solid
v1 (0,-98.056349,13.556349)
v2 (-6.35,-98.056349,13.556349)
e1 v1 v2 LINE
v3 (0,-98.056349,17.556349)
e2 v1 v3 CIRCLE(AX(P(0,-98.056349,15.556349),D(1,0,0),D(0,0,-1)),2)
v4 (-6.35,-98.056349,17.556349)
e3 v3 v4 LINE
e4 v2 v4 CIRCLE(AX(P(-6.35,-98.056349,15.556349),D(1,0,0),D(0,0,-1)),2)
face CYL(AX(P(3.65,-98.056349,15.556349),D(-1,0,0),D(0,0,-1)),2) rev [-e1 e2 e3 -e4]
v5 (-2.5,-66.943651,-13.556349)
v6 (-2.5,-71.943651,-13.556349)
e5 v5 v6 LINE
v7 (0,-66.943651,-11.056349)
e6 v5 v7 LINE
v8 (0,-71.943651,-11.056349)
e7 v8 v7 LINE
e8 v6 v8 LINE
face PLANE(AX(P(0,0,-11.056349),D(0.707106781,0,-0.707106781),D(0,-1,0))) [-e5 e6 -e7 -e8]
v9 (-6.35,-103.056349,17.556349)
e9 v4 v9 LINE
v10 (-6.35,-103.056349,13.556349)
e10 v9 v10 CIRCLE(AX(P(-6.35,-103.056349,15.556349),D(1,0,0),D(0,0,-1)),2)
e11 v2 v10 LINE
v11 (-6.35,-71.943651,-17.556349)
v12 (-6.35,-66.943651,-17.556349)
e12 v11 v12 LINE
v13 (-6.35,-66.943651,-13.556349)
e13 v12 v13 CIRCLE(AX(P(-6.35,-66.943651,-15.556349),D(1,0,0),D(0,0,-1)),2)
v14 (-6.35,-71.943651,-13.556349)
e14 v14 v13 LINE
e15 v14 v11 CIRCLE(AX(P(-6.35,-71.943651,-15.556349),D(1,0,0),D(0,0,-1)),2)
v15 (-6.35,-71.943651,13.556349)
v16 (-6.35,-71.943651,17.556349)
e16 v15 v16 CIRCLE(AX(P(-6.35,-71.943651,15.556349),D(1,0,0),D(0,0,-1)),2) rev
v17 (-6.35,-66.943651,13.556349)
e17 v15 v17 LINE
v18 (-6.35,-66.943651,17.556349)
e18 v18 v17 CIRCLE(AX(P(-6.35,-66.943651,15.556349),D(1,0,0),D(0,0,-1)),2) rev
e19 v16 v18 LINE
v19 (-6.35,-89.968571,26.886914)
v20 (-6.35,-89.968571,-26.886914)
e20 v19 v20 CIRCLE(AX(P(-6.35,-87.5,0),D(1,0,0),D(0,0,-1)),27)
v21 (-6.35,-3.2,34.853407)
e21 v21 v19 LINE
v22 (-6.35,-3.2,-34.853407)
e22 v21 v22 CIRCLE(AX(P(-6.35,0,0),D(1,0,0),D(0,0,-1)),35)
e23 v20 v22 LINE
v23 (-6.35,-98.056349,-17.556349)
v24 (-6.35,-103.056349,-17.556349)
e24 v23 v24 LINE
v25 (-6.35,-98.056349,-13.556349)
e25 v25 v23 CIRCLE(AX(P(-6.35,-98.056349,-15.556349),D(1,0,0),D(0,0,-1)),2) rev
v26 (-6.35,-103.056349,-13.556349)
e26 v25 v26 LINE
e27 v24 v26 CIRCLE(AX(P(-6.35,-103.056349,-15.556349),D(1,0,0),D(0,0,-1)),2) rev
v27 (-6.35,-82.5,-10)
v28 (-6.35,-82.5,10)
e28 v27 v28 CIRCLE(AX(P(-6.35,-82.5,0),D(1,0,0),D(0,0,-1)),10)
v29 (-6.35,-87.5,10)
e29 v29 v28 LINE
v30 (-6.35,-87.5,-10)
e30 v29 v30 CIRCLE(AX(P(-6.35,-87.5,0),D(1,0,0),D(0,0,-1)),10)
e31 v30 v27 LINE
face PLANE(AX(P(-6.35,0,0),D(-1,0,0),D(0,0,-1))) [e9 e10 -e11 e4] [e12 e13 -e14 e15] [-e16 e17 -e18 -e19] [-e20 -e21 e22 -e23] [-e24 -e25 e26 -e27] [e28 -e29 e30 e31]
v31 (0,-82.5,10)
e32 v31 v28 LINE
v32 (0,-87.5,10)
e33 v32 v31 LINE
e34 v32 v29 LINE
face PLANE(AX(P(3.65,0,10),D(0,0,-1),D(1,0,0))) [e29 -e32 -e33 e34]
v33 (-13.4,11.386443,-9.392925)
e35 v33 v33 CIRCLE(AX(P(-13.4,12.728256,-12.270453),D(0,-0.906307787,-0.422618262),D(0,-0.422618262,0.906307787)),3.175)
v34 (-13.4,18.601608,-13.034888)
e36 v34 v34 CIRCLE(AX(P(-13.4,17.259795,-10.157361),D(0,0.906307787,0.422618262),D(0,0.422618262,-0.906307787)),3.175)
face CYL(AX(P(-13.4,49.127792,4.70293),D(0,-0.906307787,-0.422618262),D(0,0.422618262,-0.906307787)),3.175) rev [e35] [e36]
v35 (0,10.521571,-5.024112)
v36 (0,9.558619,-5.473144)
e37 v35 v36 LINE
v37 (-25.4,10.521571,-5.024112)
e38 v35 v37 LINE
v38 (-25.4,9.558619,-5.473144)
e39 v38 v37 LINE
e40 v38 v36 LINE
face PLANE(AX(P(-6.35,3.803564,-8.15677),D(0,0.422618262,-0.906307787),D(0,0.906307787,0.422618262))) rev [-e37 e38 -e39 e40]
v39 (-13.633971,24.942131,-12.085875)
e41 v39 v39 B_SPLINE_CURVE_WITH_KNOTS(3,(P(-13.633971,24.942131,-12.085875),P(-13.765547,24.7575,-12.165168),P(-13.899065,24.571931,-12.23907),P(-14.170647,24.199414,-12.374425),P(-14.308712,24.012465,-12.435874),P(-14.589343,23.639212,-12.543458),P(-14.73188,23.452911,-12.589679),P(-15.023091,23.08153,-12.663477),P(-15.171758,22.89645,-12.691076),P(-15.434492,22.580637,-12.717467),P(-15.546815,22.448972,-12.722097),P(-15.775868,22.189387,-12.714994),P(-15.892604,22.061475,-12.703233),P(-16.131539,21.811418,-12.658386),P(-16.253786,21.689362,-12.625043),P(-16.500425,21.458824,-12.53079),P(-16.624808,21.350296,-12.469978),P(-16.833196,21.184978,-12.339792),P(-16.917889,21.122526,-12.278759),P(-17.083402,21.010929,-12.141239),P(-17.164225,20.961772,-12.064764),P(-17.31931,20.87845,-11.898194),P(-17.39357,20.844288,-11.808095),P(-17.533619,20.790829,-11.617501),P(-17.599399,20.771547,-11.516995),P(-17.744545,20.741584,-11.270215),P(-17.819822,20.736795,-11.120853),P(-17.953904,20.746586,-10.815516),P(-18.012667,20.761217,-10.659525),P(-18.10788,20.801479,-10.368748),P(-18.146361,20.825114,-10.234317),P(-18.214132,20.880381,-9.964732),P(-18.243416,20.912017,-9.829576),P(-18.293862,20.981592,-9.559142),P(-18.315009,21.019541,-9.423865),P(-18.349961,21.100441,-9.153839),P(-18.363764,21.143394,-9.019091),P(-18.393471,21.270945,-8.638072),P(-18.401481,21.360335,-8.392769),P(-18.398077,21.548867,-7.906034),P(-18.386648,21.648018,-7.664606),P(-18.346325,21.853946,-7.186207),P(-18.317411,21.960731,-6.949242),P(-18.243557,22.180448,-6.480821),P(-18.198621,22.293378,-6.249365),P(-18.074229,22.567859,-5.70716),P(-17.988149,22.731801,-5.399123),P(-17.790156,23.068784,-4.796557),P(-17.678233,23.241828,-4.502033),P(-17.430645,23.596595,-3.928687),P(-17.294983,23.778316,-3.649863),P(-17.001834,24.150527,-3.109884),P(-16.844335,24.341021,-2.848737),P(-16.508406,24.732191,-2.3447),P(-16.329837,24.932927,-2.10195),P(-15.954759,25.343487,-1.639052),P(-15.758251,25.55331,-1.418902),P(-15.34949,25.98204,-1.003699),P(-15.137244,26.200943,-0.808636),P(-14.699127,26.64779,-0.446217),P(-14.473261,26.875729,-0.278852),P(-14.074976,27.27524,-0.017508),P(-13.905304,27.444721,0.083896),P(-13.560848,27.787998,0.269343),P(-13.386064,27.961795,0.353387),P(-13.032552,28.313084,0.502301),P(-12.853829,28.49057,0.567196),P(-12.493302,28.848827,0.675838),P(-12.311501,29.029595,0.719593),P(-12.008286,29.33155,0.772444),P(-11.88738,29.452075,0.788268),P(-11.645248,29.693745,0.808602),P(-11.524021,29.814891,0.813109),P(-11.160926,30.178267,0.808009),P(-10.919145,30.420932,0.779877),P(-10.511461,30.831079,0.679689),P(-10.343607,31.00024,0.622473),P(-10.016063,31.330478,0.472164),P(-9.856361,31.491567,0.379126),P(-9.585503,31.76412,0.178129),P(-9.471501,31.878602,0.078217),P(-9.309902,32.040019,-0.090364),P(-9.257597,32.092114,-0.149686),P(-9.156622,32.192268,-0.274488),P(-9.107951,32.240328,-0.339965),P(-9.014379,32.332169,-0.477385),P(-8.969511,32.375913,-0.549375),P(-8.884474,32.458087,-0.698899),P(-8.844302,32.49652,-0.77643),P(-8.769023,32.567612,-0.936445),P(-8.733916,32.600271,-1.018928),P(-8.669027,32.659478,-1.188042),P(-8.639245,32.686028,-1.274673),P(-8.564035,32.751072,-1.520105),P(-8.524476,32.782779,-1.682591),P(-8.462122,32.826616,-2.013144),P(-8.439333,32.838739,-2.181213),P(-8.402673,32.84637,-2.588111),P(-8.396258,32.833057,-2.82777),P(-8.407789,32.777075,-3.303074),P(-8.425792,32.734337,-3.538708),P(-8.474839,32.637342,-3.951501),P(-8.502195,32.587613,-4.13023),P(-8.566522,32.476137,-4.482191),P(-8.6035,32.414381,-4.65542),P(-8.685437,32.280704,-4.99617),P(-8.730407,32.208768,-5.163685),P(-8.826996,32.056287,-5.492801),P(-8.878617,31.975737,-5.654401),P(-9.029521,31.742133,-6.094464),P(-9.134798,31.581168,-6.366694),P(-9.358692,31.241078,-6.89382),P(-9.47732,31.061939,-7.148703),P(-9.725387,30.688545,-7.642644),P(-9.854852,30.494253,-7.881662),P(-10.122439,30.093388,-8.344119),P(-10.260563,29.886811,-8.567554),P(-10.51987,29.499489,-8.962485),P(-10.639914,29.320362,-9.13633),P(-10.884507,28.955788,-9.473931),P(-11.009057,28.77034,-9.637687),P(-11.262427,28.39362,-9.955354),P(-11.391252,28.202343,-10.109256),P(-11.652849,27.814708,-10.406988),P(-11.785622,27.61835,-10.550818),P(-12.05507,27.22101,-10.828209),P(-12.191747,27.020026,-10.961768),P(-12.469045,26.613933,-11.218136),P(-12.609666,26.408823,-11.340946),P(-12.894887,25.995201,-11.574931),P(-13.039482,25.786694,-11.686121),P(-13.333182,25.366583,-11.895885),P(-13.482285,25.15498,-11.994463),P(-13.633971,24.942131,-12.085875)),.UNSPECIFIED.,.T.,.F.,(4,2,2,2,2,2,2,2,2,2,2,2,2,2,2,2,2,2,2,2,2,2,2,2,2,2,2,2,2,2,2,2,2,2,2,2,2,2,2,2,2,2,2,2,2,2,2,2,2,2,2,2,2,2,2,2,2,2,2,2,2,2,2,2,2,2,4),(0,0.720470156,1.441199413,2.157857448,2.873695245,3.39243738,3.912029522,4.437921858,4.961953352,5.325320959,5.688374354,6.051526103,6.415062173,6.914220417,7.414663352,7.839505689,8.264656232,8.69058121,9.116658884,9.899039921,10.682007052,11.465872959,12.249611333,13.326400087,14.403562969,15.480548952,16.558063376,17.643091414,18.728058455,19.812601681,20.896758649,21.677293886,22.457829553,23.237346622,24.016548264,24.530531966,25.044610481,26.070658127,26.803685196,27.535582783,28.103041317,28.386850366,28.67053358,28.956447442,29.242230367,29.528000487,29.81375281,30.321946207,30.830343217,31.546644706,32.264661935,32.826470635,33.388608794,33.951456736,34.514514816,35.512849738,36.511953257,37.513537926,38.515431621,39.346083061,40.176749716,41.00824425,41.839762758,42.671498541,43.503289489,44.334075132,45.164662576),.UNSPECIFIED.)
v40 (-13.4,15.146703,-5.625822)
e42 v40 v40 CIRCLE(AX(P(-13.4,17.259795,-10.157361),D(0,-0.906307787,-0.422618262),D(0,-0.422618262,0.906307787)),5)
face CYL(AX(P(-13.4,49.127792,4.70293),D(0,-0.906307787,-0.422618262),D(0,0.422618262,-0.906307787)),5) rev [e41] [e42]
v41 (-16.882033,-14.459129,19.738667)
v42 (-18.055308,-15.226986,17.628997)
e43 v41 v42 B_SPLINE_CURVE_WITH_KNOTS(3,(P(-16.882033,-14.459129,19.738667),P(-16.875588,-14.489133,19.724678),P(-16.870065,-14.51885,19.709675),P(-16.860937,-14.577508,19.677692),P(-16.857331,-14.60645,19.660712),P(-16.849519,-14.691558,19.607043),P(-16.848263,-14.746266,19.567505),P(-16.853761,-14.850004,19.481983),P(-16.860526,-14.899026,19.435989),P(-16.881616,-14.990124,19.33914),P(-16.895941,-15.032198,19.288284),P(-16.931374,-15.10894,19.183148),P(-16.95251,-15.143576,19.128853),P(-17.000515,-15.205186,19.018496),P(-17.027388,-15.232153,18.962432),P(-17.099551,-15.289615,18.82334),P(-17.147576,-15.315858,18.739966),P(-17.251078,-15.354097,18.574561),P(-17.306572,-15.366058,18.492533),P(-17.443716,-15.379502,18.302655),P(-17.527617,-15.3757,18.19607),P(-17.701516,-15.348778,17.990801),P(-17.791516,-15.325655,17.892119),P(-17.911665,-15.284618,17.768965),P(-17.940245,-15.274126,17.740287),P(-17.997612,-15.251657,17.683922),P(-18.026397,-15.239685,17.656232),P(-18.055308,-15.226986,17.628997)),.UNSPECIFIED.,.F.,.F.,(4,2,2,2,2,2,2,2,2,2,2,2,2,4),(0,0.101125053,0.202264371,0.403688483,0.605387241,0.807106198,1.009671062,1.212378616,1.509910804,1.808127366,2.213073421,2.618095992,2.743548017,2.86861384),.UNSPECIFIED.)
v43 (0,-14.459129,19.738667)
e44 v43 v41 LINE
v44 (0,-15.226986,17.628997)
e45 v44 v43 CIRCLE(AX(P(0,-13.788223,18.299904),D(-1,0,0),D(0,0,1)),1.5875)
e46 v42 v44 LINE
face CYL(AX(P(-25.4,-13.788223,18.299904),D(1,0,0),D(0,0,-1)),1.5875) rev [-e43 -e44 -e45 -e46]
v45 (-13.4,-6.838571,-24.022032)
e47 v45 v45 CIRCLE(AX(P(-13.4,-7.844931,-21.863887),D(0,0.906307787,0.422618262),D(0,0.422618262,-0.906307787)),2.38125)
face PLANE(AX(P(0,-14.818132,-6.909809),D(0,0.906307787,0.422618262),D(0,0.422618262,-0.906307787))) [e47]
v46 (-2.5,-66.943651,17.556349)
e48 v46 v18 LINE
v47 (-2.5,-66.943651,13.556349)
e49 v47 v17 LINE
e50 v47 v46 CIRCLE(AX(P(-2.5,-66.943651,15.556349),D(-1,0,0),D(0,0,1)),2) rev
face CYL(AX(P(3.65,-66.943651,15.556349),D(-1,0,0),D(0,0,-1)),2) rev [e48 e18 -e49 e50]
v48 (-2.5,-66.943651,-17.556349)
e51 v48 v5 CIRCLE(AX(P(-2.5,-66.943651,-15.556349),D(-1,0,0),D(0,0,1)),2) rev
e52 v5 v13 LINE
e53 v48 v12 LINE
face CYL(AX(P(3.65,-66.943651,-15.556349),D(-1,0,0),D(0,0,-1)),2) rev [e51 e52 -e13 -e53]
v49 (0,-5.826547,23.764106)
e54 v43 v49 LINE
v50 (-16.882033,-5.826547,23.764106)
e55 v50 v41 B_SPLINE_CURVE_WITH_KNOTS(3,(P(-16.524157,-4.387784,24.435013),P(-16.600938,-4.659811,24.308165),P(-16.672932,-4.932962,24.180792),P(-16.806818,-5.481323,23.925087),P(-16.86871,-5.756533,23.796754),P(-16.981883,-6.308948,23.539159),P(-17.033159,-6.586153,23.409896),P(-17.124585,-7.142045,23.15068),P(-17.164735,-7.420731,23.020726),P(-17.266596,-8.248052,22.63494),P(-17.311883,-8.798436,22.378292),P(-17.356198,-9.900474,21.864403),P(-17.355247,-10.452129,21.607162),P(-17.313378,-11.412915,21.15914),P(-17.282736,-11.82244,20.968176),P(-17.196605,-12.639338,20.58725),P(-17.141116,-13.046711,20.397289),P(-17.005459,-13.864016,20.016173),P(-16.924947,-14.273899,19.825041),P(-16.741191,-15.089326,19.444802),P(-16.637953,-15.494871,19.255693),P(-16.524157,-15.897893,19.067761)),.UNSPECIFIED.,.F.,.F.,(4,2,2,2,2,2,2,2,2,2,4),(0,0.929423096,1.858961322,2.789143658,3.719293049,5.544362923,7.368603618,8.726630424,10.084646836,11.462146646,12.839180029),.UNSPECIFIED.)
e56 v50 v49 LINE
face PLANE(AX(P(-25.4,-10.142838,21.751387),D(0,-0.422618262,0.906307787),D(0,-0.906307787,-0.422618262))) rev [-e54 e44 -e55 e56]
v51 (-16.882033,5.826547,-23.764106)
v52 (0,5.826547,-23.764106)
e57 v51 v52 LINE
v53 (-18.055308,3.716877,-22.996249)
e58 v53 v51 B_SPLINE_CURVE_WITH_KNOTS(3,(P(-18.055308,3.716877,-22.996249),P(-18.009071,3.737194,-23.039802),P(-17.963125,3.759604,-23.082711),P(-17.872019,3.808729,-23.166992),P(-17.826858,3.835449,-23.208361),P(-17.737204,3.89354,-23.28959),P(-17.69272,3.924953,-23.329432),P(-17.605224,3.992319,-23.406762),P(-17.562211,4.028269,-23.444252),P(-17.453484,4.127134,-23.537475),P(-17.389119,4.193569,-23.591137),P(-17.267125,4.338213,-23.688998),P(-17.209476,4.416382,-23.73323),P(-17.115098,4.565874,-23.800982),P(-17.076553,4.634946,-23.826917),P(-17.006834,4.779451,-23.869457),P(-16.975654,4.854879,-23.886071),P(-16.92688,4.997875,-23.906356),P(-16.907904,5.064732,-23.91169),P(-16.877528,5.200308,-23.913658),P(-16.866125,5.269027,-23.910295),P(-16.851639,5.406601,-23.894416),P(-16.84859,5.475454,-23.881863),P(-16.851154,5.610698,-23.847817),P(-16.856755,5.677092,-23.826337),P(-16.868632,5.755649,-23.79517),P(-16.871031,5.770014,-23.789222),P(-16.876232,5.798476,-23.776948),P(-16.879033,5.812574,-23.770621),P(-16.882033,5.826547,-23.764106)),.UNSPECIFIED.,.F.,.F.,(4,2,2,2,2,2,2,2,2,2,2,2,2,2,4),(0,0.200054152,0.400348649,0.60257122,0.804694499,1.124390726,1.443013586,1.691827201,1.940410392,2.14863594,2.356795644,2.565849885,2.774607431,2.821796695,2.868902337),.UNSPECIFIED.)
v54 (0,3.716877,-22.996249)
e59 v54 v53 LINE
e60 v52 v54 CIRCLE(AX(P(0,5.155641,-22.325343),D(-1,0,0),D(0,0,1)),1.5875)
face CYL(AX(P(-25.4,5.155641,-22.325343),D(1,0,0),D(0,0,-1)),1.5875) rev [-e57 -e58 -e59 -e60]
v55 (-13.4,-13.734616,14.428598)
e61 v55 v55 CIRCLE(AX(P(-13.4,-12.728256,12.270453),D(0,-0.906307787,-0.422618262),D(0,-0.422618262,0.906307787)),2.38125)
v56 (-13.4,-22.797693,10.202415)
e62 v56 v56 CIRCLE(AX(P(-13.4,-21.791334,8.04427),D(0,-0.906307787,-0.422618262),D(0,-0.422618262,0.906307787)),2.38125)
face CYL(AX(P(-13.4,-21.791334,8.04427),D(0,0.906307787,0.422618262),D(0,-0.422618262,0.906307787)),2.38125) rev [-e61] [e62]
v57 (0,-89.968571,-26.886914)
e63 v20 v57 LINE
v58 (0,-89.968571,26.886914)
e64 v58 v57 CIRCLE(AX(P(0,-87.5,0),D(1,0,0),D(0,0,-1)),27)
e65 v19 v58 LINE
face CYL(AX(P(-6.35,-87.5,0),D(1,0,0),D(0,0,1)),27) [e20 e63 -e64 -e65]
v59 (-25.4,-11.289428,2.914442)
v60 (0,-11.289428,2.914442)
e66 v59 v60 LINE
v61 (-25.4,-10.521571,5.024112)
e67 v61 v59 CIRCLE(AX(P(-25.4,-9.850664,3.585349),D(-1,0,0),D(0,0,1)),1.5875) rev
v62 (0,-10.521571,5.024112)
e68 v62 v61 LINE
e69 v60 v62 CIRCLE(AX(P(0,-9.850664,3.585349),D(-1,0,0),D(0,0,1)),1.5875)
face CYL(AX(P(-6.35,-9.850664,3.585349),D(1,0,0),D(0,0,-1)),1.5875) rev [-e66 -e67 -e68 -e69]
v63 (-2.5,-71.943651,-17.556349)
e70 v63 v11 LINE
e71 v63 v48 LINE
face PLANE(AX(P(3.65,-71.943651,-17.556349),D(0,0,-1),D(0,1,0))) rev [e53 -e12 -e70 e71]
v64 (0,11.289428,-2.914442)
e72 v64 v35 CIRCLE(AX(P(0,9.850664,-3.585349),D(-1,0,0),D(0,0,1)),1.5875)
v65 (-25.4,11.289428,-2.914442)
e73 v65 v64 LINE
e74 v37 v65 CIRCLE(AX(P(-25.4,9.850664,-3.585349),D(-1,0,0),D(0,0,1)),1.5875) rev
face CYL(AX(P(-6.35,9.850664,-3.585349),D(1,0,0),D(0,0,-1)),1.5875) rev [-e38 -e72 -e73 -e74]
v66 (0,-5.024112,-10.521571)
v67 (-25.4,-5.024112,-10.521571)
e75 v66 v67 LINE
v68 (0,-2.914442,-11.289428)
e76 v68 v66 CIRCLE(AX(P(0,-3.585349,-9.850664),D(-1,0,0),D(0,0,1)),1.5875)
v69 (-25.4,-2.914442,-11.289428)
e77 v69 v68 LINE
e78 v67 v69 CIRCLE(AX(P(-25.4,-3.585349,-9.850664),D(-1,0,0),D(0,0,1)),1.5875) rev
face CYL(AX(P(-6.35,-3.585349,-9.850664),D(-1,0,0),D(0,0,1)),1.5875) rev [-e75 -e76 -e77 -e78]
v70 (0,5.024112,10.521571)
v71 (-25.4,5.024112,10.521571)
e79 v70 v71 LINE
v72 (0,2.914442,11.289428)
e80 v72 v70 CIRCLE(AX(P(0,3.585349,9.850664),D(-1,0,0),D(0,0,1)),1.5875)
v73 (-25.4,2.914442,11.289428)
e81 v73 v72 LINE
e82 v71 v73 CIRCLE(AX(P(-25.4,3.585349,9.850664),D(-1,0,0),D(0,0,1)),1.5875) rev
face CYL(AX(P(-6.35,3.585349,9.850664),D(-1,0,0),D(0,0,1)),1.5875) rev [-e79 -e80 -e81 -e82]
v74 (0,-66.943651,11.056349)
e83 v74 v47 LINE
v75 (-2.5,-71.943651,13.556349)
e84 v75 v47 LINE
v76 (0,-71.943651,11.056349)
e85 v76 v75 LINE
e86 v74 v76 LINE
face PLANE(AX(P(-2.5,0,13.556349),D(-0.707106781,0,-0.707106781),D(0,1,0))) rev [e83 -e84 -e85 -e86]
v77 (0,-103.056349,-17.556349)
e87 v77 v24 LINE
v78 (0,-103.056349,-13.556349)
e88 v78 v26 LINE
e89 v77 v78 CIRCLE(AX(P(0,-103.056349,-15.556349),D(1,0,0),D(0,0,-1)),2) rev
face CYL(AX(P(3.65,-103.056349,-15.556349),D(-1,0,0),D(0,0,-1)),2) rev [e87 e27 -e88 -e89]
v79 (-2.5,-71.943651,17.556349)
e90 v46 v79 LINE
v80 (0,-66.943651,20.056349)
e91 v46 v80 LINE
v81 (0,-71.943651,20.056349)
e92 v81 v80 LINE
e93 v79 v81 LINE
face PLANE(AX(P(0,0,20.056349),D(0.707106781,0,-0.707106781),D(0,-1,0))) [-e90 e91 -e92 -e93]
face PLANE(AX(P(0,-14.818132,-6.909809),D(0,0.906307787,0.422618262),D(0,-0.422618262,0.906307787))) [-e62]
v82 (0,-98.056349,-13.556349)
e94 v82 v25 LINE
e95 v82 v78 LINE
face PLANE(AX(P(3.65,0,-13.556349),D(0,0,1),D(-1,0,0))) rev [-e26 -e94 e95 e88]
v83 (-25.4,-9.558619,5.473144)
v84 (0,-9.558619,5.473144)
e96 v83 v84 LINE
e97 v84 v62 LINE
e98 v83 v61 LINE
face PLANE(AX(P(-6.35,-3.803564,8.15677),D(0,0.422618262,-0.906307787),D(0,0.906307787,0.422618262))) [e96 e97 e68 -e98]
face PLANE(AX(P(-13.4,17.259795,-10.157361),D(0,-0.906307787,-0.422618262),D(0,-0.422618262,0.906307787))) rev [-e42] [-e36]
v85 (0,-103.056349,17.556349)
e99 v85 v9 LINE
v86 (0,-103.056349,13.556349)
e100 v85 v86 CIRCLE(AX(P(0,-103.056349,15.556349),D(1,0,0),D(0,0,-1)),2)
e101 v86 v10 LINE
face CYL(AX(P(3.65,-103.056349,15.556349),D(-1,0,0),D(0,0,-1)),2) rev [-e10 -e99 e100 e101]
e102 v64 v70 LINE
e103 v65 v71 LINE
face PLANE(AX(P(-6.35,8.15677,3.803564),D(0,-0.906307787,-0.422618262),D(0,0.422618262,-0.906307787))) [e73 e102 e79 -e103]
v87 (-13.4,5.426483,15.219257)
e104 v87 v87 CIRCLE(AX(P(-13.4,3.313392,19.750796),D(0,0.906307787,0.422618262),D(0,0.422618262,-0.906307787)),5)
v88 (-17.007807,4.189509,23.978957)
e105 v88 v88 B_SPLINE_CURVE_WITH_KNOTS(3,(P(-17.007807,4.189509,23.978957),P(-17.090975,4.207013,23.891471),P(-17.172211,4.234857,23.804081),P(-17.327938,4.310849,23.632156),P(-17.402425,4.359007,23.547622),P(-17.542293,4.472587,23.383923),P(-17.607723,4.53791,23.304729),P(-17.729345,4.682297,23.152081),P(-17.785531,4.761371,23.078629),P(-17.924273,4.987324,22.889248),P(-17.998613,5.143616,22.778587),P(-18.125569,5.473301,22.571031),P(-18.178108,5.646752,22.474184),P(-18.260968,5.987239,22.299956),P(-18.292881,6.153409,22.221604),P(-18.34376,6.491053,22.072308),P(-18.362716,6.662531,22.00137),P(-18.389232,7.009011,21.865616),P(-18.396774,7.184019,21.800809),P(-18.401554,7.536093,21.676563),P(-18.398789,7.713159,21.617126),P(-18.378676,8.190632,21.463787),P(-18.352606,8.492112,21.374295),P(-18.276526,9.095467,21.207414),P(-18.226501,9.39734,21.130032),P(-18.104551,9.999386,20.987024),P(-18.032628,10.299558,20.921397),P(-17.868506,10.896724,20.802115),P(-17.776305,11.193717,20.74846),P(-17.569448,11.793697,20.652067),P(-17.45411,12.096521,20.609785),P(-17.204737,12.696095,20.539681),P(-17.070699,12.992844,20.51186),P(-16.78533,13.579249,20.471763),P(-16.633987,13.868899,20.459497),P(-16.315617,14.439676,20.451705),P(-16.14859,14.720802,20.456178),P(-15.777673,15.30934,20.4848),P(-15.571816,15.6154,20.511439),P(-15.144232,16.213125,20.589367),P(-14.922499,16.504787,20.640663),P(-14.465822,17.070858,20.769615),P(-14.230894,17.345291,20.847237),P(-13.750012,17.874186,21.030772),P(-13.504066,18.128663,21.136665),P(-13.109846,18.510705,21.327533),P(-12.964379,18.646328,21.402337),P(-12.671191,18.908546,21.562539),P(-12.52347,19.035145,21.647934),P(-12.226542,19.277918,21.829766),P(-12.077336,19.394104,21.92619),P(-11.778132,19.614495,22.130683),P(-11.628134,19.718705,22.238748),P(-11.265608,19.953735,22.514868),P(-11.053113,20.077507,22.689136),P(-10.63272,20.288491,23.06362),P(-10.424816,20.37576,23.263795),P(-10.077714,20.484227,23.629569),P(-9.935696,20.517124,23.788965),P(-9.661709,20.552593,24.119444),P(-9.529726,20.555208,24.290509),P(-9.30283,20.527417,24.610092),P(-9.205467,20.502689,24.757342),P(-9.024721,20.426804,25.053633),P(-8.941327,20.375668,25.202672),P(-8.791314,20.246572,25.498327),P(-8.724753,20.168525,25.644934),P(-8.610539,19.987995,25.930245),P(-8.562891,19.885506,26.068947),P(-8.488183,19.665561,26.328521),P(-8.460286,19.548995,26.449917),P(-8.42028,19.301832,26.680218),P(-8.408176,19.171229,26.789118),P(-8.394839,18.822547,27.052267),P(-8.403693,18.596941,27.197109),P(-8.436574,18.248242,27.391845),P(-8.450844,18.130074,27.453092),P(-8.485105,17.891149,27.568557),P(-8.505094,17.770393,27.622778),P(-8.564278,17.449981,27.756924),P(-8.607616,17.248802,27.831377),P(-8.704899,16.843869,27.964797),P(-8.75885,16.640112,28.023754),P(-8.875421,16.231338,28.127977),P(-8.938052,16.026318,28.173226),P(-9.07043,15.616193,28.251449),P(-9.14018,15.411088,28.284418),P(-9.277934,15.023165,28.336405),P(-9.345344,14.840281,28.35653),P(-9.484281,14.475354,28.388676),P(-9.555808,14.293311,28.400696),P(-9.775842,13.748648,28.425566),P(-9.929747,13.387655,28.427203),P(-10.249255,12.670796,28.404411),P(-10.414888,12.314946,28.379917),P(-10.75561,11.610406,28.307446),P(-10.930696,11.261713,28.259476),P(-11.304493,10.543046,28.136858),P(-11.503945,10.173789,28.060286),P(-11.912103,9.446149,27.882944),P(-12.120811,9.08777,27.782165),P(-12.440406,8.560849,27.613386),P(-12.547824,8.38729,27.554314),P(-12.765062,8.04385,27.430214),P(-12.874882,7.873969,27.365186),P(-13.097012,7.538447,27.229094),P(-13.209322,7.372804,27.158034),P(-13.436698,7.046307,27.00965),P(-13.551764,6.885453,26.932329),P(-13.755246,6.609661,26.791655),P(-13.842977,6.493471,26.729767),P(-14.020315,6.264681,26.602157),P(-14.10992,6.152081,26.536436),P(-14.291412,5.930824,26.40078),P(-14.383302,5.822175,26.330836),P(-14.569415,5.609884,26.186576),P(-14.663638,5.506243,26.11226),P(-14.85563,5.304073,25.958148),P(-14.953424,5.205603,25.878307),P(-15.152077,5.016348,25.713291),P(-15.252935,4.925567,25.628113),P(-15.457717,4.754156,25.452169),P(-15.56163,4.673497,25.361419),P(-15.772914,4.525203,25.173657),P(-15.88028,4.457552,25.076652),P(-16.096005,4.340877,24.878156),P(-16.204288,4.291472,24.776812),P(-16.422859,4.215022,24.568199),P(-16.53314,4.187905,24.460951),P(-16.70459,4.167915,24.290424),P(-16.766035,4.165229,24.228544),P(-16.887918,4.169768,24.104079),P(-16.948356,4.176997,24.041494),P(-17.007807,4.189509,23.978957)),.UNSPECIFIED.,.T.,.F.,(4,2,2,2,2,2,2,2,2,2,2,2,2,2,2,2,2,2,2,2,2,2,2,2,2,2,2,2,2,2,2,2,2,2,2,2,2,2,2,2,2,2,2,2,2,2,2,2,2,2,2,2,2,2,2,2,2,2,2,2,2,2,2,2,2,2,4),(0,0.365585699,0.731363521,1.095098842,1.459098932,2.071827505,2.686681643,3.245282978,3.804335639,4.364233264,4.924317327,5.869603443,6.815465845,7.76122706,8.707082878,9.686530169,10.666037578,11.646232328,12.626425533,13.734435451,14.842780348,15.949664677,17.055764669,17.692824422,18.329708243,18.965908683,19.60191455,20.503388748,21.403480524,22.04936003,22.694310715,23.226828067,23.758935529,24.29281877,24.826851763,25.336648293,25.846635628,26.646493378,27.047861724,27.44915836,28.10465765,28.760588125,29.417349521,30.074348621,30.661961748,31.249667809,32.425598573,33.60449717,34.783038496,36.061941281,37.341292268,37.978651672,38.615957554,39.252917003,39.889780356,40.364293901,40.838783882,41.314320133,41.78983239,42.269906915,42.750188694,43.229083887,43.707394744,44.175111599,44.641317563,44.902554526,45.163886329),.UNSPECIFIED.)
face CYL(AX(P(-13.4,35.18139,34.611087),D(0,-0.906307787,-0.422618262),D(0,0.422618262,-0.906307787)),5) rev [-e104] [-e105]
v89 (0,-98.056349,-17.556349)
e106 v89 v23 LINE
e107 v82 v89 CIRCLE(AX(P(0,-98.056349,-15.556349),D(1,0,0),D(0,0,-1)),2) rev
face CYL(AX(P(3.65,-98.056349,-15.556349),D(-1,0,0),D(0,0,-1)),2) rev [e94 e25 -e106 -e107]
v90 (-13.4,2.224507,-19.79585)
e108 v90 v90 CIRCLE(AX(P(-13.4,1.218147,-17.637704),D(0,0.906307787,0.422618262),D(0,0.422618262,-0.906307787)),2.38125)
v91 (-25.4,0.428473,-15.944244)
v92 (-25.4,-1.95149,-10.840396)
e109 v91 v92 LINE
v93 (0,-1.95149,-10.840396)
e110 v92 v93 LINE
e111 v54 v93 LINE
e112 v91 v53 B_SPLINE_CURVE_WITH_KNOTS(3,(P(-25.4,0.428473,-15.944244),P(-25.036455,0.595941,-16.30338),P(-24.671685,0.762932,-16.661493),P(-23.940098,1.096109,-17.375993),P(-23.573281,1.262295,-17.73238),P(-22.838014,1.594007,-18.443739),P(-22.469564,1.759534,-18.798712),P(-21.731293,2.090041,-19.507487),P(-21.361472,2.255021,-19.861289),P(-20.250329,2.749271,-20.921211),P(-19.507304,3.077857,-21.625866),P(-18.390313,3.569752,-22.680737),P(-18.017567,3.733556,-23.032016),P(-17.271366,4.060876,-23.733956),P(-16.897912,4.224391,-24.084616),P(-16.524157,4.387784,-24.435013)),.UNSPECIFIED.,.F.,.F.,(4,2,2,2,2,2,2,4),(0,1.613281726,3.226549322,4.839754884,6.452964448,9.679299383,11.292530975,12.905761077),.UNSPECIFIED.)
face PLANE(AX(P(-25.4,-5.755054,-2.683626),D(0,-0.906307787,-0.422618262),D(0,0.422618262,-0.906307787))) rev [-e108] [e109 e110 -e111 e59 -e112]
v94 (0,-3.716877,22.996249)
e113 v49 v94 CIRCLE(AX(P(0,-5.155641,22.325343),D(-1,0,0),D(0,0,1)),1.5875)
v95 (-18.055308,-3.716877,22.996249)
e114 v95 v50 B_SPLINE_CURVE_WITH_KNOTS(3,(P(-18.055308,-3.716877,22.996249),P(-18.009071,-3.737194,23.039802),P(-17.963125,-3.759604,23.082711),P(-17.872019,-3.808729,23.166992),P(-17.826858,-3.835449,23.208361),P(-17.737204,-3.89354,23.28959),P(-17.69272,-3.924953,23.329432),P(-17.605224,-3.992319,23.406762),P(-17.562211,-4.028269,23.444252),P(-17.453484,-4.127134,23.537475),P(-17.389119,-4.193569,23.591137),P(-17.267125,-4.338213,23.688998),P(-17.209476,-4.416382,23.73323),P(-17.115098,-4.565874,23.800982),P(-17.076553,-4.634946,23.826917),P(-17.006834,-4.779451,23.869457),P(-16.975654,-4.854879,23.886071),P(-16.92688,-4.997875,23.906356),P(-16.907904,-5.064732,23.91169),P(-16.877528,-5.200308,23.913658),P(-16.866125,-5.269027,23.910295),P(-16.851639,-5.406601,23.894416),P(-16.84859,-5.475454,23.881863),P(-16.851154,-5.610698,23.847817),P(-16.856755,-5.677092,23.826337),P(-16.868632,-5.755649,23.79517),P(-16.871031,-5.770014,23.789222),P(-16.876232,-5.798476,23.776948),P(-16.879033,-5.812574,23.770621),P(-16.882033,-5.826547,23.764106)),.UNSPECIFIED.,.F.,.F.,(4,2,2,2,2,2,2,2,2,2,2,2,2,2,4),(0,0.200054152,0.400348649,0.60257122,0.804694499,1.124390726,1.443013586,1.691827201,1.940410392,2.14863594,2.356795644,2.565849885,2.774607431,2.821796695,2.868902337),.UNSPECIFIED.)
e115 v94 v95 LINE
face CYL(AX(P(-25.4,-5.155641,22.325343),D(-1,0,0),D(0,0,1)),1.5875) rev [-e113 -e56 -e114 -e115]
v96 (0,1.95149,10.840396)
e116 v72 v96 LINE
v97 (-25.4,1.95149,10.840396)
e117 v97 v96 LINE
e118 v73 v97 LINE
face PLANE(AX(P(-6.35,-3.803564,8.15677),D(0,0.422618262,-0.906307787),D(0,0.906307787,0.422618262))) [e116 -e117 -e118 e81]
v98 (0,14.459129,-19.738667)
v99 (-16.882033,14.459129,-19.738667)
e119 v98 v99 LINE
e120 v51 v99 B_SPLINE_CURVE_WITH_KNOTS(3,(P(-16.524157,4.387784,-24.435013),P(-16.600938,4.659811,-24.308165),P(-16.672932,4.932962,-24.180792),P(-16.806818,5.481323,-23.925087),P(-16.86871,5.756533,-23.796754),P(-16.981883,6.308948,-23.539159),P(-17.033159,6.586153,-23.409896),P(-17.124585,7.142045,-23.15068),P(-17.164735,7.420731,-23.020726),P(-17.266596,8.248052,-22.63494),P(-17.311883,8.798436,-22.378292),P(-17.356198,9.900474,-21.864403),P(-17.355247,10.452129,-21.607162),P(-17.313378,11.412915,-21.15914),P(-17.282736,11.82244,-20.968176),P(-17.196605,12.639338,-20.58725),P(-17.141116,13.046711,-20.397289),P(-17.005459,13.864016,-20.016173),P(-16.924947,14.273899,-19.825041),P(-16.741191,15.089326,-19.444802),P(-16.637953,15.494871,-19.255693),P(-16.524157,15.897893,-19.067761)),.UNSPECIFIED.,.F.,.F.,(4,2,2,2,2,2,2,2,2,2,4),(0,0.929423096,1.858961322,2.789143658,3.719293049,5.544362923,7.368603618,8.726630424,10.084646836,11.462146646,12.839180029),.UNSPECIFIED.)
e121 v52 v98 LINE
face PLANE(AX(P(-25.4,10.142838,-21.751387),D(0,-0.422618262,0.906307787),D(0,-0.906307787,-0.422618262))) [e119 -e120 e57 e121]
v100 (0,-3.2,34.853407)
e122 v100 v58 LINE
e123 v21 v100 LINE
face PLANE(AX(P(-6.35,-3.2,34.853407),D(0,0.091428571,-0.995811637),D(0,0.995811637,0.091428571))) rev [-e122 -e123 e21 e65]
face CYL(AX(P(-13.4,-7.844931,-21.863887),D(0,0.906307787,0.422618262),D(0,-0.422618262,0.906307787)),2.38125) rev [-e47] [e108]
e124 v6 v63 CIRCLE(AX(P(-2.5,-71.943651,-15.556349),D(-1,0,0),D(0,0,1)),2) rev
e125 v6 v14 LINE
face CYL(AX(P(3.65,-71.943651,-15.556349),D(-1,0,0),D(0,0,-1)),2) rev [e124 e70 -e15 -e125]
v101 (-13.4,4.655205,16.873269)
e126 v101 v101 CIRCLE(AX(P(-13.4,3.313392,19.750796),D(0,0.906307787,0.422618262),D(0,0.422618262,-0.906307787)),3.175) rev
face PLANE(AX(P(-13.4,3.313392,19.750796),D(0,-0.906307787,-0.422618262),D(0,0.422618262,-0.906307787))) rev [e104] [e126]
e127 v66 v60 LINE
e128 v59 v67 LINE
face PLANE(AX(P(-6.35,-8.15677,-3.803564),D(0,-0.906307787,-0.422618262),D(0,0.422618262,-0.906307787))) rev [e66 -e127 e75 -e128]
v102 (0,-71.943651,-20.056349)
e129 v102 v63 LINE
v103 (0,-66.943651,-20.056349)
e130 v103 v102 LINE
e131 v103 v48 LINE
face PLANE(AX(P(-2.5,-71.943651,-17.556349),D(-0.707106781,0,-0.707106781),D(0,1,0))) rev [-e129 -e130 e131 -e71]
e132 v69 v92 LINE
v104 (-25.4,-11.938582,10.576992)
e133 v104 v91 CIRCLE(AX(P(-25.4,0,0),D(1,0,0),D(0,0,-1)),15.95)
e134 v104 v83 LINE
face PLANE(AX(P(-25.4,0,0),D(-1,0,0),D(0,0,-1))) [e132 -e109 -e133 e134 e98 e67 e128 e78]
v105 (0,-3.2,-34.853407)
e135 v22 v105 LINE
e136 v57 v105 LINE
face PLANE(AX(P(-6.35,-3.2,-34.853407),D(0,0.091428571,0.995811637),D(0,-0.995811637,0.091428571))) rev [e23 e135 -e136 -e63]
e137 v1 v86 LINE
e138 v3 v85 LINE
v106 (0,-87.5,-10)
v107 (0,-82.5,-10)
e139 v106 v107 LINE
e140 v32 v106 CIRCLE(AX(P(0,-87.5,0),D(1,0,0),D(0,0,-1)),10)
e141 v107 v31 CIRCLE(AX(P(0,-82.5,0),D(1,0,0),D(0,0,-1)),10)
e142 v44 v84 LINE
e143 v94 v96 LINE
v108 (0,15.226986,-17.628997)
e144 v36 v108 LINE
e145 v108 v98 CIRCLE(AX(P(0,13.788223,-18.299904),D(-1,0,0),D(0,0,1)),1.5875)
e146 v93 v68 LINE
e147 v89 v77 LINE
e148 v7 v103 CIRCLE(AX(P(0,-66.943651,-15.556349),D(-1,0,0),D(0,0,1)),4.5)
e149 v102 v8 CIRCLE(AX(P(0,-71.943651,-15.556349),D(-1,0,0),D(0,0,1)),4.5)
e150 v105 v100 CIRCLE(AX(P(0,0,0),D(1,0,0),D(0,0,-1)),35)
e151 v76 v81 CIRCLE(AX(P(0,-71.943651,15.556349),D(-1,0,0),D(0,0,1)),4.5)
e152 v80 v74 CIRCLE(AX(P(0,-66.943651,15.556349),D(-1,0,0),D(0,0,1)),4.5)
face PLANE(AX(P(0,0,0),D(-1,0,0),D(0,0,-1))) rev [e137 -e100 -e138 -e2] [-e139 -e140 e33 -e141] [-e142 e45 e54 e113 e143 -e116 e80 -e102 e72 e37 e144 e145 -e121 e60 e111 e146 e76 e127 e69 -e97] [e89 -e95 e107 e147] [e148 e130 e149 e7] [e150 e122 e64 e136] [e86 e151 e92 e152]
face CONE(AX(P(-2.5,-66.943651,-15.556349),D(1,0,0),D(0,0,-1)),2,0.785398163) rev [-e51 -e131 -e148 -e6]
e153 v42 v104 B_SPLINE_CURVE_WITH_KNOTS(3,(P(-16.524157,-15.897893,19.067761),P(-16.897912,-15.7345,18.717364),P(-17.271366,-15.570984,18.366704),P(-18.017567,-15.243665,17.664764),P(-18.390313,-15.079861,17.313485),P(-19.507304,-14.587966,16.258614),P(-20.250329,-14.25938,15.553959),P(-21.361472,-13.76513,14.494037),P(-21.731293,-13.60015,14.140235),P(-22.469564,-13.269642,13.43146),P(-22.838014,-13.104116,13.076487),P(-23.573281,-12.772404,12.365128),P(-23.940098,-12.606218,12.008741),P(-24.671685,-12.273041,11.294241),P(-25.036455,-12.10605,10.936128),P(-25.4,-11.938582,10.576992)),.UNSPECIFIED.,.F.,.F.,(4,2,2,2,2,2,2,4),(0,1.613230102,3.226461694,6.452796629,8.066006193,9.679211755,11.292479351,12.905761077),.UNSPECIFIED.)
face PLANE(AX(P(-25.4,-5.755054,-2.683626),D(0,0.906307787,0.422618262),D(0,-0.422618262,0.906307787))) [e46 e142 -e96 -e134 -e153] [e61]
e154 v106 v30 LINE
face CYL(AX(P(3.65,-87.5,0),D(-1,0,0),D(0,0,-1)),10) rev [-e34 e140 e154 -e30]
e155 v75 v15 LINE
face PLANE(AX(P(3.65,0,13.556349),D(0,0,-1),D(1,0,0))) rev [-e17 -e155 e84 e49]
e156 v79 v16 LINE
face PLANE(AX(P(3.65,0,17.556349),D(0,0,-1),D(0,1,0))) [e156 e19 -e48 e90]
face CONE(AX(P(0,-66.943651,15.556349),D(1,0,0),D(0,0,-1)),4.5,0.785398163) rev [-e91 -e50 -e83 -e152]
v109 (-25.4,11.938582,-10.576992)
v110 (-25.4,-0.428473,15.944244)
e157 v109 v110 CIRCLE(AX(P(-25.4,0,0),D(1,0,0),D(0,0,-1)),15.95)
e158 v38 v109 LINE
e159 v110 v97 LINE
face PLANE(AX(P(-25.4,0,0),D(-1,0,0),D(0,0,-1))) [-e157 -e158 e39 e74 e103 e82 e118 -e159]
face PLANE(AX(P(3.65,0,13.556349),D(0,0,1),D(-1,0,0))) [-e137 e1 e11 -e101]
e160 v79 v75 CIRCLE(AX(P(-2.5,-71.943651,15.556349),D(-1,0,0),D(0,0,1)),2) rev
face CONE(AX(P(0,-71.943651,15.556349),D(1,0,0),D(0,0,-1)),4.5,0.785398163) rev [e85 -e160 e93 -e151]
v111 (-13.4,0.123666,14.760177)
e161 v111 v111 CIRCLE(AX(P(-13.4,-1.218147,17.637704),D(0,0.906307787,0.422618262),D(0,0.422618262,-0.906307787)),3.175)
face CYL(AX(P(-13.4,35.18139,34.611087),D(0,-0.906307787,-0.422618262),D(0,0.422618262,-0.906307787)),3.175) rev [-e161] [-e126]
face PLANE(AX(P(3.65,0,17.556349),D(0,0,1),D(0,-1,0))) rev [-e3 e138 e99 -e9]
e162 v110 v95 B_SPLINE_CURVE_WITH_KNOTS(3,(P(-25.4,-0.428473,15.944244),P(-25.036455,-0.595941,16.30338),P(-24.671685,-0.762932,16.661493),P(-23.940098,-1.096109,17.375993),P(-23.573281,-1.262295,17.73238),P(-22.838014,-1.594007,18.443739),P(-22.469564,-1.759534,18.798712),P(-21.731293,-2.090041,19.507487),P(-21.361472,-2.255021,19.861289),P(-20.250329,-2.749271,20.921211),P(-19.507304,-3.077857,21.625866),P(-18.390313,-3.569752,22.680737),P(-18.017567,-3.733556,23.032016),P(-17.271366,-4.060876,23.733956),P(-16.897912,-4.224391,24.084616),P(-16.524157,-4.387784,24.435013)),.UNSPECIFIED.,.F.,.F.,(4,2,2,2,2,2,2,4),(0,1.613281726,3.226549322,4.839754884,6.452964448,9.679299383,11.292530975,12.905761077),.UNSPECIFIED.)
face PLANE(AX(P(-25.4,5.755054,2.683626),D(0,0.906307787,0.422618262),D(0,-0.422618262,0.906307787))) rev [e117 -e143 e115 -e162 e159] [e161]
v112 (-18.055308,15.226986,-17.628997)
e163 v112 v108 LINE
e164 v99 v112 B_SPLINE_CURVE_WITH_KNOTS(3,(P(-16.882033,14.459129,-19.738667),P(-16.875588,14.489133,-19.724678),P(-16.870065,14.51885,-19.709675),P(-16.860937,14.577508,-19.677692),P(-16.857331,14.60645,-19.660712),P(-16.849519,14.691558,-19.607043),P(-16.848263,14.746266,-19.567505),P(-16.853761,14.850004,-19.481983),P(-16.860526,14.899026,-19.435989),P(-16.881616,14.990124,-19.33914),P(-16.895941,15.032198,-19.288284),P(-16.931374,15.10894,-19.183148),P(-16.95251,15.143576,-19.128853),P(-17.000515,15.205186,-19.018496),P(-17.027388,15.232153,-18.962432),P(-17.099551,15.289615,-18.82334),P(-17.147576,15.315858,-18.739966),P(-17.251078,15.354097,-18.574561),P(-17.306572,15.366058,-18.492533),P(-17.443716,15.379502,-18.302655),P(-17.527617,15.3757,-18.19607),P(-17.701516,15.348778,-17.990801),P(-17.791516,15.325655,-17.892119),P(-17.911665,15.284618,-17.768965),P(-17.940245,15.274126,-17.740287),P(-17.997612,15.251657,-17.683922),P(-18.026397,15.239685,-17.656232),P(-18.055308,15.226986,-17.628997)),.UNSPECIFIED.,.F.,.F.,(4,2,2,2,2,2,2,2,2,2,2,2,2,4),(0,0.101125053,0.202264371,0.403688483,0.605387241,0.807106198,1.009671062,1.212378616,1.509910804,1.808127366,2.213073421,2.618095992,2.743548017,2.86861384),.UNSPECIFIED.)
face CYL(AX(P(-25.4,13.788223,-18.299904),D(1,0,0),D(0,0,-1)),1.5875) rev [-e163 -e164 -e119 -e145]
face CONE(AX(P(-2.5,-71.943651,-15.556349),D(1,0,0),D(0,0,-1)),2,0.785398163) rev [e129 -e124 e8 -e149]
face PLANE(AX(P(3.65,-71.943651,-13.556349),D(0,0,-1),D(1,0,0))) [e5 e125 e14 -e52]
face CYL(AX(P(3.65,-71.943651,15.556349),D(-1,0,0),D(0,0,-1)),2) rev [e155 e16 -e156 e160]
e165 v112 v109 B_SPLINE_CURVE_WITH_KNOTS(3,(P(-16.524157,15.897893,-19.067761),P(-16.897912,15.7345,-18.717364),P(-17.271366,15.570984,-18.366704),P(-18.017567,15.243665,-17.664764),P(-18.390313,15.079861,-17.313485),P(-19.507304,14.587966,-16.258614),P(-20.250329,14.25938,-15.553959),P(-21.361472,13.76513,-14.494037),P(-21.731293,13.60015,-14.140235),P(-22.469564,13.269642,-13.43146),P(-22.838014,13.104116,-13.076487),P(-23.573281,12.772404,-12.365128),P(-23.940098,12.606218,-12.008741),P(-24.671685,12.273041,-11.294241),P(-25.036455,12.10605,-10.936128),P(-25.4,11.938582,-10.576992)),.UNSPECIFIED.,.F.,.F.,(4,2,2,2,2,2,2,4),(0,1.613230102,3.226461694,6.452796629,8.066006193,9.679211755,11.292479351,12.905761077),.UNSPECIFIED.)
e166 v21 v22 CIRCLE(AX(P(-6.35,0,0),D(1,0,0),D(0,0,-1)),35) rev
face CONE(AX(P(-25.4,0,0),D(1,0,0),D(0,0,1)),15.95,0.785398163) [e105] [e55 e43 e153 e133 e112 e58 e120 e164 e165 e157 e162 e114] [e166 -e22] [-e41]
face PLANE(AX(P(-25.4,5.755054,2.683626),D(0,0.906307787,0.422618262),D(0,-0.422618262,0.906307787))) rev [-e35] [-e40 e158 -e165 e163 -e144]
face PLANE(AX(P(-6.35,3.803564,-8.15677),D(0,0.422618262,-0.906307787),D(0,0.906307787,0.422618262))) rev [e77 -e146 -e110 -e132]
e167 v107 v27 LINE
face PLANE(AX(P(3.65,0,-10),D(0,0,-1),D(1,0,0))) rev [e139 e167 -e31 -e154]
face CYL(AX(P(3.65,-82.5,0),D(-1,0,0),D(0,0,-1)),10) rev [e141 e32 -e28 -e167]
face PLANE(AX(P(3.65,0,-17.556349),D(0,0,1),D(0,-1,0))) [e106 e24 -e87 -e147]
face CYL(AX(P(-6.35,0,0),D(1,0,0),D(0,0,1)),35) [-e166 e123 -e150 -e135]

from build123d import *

# Parameters (mm, degrees)
BOSS_EXTRUDE1_DEPTH = 6.35
SKETCH20_R          = 35
BOSS_EXTRUDE5_DEPTH = 19.05
CUT_EXTRUDE14_DEPTH = 123.39448517
CHAMFER1_SIZE       = 19.05
SKETCH22_R          = 3.175
CUT_EXTRUDE15_DEPTH = 129.555411344
SKETCH24_R          = 5
CUT_EXTRUDE16_DEPTH = 134.419011414
SKETCH25_R          = 2.38125
CUT_EXTRUDE17_DEPTH = 10
CUT_EXTRUDE18_DEPTH = 10
CHAMFER3_SIZE       = 2.5
FILLET1_R           = 1.5875


with BuildPart() as part:
    # Sketch1 → Boss-Extrude1 (new body)
    with BuildSketch(Plane(origin=(0, 0, 0), x_dir=(0, 0, -1), z_dir=(1, 0, 0))):
        with BuildLine():
            Line((-34.853407294, -3.2), (-26.886914198, -89.968571429))
            ThreePointArc((-26.886914198, -89.968571429), (0, -114.5), (26.886914198, -89.968571429))
            Line((26.886914198, -89.968571429), (34.853407294, -3.2))
            ThreePointArc((34.853407294, -3.2), (0, 35), (-34.853407294, -3.2))
        make_face()
        Polygon((4.353205728, 11.960334439), (-11.960334439, 4.353205728), (-4.353205728, -11.960334439), (11.960334439, -4.353205728), align=None, mode=Mode.SUBTRACT)
    extrude(amount=BOSS_EXTRUDE1_DEPTH)

    # Sketch20 → Boss-Extrude5 (add)
    with BuildSketch(Plane(origin=(6.35, 0, 0), x_dir=(0, 0, -1), z_dir=(1, 0, 0))):
        with Locations(Location((0, 0, 0), (0, 0, 185.245797084))):
            Circle(SKETCH20_R)
    extrude(amount=BOSS_EXTRUDE5_DEPTH)

    # Sketch21 → Cut-Extrude14 (cut, through all)
    with BuildSketch(Plane.ZY):
        Polygon((-19.067760927, 15.897892729), (-24.435012851, 4.387783834), (-10.840396045, -1.951490092), (-5.473144121, 9.558618803), align=None)
        Polygon((-11.960334439, -4.353205728), (-4.353205728, 11.960334439), (11.960334439, 4.353205728), (4.353205728, -11.960334439), align=None)
        Polygon((10.840396045, 1.951490092), (5.473144121, -9.558618803), (19.067760927, -15.897892729), (24.435012851, -4.387783834), align=None)
    extrude(amount=-CUT_EXTRUDE14_DEPTH, mode=Mode.SUBTRACT)

    # Chamfer1
    # the kernel refuses this chamfer: 19.05 mm, written as the material it takes off along each edge
    with BuildSketch(Plane(origin=(25.4, 0, 0), x_dir=(0, -0.09142857142327497, 0.9958116369713196), z_dir=(0, 0.9958116369713196, 0.09142857142327497))) as chamfer1_piece_1:
        Polygon((35 - CHAMFER1_SIZE, 0), (35, -CHAMFER1_SIZE), (35, 0), align=None)
    revolve(axis=Axis((25.4, 0, 0), (1, 0, 0)), mode=Mode.SUBTRACT)

    # Sketch22 → Cut-Extrude15 (cut, through all)
    with BuildSketch(Plane(origin=(0, 5.755054448, 2.683625962), x_dir=(-1, 0, 0), z_dir=(0, -0.9063077870366495, -0.4226182617407006))):
        with Locations(Location((-13.4, -16.5, 0), (0, 0, 90))):
            Circle(SKETCH22_R)
    cut_extrude15 = extrude(amount=-CUT_EXTRUDE15_DEPTH, mode=Mode.SUBTRACT)

    # Sketch24 → Cut-Extrude16 (cut, through all)
    with BuildSketch(Plane(origin=(0, 10.286593383, 4.796717271), x_dir=(-1, 0, 0), z_dir=(0, -0.9063077870366495, -0.4226182617407006))):
        with Locations(Location((-13.4, -16.5, 0), (0, 0, 90))):
            Circle(SKETCH24_R)
    cut_extrude16 = extrude(amount=-CUT_EXTRUDE16_DEPTH, mode=Mode.SUBTRACT)

    # Sketch25 → Cut-Extrude17 (cut)
    with BuildSketch(Plane(origin=(0, -5.755054448, -2.683625962), x_dir=(1, 0, 0), z_dir=(0, 0.9063077870366495, 0.4226182617407006))):
        with Locations(Location((13.4, -16.5, 0), (0, 0, 270))):
            Circle(SKETCH25_R)
    cut_extrude17 = extrude(amount=-CUT_EXTRUDE17_DEPTH, mode=Mode.SUBTRACT)

    # Mirror1: Cut-Extrude15, Cut-Extrude16, Cut-Extrude17 across plane
    add(cut_extrude15.mirror(Plane(origin=(0, 0, 0), x_dir=(1, 0, 0), z_dir=(0, 0.422618261740701, -0.9063077870366492))), mode=Mode.SUBTRACT)
    add(cut_extrude16.mirror(Plane(origin=(0, 0, 0), x_dir=(1, 0, 0), z_dir=(0, 0.422618261740701, -0.9063077870366492))), mode=Mode.SUBTRACT)
    add(cut_extrude17.mirror(Plane(origin=(0, 0, 0), x_dir=(1, 0, 0), z_dir=(0, 0.422618261740701, -0.9063077870366492))), mode=Mode.SUBTRACT)

    # Sketch19 → Cut-Extrude18 (cut)
    with BuildSketch(Plane(origin=(6.35, 0, 0), x_dir=(0, 0, -1), z_dir=(1, 0, 0))):
        with BuildLine():
            Line((13.556349186, -66.943650814), (13.556349186, -71.943650814))
            ThreePointArc((13.556349186, -71.943650814), (15.556349186, -73.943650814), (17.556349186, -71.943650814))
            Line((17.556349186, -71.943650814), (17.556349186, -66.943650814))
            ThreePointArc((17.556349186, -66.943650814), (15.556349186, -64.943650814), (13.556349186, -66.943650814))
        make_face()
        with BuildLine():
            Line((-10, -82.5), (-10, -87.5))
            ThreePointArc((-10, -87.5), (0, -97.5), (10, -87.5))
            Line((10, -87.5), (10, -82.5))
            ThreePointArc((10, -82.5), (0, -72.5), (-10, -82.5))
        make_face()
        with BuildLine():
            Line((17.556349186, -103.056349186), (17.556349186, -98.056349186))
            ThreePointArc((17.556349186, -98.056349186), (15.556349186, -96.056349186), (13.556349186, -98.056349186))
            Line((13.556349186, -98.056349186), (13.556349186, -103.056349186))
            ThreePointArc((13.556349186, -103.056349186), (15.556349186, -105.056349186), (17.556349186, -103.056349186))
        make_face()
        with BuildLine():
            Line((-17.556349186, -66.943650814), (-17.556349186, -71.943650814))
            ThreePointArc((-17.556349186, -71.943650814), (-15.556349186, -73.943650814), (-13.556349186, -71.943650814))
            Line((-13.556349186, -71.943650814), (-13.556349186, -66.943650814))
            ThreePointArc((-13.556349186, -66.943650814), (-15.556349186, -64.943650814), (-17.556349186, -66.943650814))
        make_face()
        with BuildLine():
            Line((-13.556349186, -103.056349186), (-13.556349186, -98.056349186))
            ThreePointArc((-13.556349186, -98.056349186), (-15.556349186, -96.056349186), (-17.556349186, -98.056349186))
            Line((-17.556349186, -98.056349186), (-17.556349186, -103.056349186))
            ThreePointArc((-17.556349186, -103.056349186), (-15.556349186, -105.056349186), (-13.556349186, -103.056349186))
        make_face()
    extrude(amount=-CUT_EXTRUDE18_DEPTH, mode=Mode.SUBTRACT)


with BuildPart() as body_2:
    # Mirror2: mirrored copy
    add(part.part.mirror(Plane(origin=(0, 0, 0), x_dir=(0, 0, 1), z_dir=(1, 0, 0))))

    # Chamfer3
    chamfer3_edges = [body_2.edges().sort_by_distance(p)[0] for p in [
        (0, -69.443650814, 13.556349186),
        (0, -64.943650814, 15.556349186),
        (0, -69.443650814, 17.556349186),
        (0, -73.943650814, 15.556349186),
        (0, -69.443650814, -17.556349186),
        (0, -64.943650814, -15.556349186),
        (0, -69.443650814, -13.556349186),
        (0, -73.943650814, -15.556349186),
    ]]
    chamfer(chamfer3_edges, length=CHAMFER3_SIZE)

    # Fillet1
    fillet1_edges = [body_2.edges().sort_by_distance(p)[0] for p in [
        (-8.262078305, 4.387783834, -24.435012851),
        (-8.262078305, 15.897892729, -19.067760927),
        (-8.262078305, -4.387783834, 24.435012851),
        (-8.262078305, -15.897892729, 19.067760927),
        (-12.7, 11.960334439, -4.353205728),
        (-12.7, 4.353205728, 11.960334439),
        (-12.7, -11.960334439, 4.353205728),
        (-12.7, -4.353205728, -11.960334439),
    ]]
    fillet(fillet1_edges, radius=FILLET1_R)


solid = body_2.part
